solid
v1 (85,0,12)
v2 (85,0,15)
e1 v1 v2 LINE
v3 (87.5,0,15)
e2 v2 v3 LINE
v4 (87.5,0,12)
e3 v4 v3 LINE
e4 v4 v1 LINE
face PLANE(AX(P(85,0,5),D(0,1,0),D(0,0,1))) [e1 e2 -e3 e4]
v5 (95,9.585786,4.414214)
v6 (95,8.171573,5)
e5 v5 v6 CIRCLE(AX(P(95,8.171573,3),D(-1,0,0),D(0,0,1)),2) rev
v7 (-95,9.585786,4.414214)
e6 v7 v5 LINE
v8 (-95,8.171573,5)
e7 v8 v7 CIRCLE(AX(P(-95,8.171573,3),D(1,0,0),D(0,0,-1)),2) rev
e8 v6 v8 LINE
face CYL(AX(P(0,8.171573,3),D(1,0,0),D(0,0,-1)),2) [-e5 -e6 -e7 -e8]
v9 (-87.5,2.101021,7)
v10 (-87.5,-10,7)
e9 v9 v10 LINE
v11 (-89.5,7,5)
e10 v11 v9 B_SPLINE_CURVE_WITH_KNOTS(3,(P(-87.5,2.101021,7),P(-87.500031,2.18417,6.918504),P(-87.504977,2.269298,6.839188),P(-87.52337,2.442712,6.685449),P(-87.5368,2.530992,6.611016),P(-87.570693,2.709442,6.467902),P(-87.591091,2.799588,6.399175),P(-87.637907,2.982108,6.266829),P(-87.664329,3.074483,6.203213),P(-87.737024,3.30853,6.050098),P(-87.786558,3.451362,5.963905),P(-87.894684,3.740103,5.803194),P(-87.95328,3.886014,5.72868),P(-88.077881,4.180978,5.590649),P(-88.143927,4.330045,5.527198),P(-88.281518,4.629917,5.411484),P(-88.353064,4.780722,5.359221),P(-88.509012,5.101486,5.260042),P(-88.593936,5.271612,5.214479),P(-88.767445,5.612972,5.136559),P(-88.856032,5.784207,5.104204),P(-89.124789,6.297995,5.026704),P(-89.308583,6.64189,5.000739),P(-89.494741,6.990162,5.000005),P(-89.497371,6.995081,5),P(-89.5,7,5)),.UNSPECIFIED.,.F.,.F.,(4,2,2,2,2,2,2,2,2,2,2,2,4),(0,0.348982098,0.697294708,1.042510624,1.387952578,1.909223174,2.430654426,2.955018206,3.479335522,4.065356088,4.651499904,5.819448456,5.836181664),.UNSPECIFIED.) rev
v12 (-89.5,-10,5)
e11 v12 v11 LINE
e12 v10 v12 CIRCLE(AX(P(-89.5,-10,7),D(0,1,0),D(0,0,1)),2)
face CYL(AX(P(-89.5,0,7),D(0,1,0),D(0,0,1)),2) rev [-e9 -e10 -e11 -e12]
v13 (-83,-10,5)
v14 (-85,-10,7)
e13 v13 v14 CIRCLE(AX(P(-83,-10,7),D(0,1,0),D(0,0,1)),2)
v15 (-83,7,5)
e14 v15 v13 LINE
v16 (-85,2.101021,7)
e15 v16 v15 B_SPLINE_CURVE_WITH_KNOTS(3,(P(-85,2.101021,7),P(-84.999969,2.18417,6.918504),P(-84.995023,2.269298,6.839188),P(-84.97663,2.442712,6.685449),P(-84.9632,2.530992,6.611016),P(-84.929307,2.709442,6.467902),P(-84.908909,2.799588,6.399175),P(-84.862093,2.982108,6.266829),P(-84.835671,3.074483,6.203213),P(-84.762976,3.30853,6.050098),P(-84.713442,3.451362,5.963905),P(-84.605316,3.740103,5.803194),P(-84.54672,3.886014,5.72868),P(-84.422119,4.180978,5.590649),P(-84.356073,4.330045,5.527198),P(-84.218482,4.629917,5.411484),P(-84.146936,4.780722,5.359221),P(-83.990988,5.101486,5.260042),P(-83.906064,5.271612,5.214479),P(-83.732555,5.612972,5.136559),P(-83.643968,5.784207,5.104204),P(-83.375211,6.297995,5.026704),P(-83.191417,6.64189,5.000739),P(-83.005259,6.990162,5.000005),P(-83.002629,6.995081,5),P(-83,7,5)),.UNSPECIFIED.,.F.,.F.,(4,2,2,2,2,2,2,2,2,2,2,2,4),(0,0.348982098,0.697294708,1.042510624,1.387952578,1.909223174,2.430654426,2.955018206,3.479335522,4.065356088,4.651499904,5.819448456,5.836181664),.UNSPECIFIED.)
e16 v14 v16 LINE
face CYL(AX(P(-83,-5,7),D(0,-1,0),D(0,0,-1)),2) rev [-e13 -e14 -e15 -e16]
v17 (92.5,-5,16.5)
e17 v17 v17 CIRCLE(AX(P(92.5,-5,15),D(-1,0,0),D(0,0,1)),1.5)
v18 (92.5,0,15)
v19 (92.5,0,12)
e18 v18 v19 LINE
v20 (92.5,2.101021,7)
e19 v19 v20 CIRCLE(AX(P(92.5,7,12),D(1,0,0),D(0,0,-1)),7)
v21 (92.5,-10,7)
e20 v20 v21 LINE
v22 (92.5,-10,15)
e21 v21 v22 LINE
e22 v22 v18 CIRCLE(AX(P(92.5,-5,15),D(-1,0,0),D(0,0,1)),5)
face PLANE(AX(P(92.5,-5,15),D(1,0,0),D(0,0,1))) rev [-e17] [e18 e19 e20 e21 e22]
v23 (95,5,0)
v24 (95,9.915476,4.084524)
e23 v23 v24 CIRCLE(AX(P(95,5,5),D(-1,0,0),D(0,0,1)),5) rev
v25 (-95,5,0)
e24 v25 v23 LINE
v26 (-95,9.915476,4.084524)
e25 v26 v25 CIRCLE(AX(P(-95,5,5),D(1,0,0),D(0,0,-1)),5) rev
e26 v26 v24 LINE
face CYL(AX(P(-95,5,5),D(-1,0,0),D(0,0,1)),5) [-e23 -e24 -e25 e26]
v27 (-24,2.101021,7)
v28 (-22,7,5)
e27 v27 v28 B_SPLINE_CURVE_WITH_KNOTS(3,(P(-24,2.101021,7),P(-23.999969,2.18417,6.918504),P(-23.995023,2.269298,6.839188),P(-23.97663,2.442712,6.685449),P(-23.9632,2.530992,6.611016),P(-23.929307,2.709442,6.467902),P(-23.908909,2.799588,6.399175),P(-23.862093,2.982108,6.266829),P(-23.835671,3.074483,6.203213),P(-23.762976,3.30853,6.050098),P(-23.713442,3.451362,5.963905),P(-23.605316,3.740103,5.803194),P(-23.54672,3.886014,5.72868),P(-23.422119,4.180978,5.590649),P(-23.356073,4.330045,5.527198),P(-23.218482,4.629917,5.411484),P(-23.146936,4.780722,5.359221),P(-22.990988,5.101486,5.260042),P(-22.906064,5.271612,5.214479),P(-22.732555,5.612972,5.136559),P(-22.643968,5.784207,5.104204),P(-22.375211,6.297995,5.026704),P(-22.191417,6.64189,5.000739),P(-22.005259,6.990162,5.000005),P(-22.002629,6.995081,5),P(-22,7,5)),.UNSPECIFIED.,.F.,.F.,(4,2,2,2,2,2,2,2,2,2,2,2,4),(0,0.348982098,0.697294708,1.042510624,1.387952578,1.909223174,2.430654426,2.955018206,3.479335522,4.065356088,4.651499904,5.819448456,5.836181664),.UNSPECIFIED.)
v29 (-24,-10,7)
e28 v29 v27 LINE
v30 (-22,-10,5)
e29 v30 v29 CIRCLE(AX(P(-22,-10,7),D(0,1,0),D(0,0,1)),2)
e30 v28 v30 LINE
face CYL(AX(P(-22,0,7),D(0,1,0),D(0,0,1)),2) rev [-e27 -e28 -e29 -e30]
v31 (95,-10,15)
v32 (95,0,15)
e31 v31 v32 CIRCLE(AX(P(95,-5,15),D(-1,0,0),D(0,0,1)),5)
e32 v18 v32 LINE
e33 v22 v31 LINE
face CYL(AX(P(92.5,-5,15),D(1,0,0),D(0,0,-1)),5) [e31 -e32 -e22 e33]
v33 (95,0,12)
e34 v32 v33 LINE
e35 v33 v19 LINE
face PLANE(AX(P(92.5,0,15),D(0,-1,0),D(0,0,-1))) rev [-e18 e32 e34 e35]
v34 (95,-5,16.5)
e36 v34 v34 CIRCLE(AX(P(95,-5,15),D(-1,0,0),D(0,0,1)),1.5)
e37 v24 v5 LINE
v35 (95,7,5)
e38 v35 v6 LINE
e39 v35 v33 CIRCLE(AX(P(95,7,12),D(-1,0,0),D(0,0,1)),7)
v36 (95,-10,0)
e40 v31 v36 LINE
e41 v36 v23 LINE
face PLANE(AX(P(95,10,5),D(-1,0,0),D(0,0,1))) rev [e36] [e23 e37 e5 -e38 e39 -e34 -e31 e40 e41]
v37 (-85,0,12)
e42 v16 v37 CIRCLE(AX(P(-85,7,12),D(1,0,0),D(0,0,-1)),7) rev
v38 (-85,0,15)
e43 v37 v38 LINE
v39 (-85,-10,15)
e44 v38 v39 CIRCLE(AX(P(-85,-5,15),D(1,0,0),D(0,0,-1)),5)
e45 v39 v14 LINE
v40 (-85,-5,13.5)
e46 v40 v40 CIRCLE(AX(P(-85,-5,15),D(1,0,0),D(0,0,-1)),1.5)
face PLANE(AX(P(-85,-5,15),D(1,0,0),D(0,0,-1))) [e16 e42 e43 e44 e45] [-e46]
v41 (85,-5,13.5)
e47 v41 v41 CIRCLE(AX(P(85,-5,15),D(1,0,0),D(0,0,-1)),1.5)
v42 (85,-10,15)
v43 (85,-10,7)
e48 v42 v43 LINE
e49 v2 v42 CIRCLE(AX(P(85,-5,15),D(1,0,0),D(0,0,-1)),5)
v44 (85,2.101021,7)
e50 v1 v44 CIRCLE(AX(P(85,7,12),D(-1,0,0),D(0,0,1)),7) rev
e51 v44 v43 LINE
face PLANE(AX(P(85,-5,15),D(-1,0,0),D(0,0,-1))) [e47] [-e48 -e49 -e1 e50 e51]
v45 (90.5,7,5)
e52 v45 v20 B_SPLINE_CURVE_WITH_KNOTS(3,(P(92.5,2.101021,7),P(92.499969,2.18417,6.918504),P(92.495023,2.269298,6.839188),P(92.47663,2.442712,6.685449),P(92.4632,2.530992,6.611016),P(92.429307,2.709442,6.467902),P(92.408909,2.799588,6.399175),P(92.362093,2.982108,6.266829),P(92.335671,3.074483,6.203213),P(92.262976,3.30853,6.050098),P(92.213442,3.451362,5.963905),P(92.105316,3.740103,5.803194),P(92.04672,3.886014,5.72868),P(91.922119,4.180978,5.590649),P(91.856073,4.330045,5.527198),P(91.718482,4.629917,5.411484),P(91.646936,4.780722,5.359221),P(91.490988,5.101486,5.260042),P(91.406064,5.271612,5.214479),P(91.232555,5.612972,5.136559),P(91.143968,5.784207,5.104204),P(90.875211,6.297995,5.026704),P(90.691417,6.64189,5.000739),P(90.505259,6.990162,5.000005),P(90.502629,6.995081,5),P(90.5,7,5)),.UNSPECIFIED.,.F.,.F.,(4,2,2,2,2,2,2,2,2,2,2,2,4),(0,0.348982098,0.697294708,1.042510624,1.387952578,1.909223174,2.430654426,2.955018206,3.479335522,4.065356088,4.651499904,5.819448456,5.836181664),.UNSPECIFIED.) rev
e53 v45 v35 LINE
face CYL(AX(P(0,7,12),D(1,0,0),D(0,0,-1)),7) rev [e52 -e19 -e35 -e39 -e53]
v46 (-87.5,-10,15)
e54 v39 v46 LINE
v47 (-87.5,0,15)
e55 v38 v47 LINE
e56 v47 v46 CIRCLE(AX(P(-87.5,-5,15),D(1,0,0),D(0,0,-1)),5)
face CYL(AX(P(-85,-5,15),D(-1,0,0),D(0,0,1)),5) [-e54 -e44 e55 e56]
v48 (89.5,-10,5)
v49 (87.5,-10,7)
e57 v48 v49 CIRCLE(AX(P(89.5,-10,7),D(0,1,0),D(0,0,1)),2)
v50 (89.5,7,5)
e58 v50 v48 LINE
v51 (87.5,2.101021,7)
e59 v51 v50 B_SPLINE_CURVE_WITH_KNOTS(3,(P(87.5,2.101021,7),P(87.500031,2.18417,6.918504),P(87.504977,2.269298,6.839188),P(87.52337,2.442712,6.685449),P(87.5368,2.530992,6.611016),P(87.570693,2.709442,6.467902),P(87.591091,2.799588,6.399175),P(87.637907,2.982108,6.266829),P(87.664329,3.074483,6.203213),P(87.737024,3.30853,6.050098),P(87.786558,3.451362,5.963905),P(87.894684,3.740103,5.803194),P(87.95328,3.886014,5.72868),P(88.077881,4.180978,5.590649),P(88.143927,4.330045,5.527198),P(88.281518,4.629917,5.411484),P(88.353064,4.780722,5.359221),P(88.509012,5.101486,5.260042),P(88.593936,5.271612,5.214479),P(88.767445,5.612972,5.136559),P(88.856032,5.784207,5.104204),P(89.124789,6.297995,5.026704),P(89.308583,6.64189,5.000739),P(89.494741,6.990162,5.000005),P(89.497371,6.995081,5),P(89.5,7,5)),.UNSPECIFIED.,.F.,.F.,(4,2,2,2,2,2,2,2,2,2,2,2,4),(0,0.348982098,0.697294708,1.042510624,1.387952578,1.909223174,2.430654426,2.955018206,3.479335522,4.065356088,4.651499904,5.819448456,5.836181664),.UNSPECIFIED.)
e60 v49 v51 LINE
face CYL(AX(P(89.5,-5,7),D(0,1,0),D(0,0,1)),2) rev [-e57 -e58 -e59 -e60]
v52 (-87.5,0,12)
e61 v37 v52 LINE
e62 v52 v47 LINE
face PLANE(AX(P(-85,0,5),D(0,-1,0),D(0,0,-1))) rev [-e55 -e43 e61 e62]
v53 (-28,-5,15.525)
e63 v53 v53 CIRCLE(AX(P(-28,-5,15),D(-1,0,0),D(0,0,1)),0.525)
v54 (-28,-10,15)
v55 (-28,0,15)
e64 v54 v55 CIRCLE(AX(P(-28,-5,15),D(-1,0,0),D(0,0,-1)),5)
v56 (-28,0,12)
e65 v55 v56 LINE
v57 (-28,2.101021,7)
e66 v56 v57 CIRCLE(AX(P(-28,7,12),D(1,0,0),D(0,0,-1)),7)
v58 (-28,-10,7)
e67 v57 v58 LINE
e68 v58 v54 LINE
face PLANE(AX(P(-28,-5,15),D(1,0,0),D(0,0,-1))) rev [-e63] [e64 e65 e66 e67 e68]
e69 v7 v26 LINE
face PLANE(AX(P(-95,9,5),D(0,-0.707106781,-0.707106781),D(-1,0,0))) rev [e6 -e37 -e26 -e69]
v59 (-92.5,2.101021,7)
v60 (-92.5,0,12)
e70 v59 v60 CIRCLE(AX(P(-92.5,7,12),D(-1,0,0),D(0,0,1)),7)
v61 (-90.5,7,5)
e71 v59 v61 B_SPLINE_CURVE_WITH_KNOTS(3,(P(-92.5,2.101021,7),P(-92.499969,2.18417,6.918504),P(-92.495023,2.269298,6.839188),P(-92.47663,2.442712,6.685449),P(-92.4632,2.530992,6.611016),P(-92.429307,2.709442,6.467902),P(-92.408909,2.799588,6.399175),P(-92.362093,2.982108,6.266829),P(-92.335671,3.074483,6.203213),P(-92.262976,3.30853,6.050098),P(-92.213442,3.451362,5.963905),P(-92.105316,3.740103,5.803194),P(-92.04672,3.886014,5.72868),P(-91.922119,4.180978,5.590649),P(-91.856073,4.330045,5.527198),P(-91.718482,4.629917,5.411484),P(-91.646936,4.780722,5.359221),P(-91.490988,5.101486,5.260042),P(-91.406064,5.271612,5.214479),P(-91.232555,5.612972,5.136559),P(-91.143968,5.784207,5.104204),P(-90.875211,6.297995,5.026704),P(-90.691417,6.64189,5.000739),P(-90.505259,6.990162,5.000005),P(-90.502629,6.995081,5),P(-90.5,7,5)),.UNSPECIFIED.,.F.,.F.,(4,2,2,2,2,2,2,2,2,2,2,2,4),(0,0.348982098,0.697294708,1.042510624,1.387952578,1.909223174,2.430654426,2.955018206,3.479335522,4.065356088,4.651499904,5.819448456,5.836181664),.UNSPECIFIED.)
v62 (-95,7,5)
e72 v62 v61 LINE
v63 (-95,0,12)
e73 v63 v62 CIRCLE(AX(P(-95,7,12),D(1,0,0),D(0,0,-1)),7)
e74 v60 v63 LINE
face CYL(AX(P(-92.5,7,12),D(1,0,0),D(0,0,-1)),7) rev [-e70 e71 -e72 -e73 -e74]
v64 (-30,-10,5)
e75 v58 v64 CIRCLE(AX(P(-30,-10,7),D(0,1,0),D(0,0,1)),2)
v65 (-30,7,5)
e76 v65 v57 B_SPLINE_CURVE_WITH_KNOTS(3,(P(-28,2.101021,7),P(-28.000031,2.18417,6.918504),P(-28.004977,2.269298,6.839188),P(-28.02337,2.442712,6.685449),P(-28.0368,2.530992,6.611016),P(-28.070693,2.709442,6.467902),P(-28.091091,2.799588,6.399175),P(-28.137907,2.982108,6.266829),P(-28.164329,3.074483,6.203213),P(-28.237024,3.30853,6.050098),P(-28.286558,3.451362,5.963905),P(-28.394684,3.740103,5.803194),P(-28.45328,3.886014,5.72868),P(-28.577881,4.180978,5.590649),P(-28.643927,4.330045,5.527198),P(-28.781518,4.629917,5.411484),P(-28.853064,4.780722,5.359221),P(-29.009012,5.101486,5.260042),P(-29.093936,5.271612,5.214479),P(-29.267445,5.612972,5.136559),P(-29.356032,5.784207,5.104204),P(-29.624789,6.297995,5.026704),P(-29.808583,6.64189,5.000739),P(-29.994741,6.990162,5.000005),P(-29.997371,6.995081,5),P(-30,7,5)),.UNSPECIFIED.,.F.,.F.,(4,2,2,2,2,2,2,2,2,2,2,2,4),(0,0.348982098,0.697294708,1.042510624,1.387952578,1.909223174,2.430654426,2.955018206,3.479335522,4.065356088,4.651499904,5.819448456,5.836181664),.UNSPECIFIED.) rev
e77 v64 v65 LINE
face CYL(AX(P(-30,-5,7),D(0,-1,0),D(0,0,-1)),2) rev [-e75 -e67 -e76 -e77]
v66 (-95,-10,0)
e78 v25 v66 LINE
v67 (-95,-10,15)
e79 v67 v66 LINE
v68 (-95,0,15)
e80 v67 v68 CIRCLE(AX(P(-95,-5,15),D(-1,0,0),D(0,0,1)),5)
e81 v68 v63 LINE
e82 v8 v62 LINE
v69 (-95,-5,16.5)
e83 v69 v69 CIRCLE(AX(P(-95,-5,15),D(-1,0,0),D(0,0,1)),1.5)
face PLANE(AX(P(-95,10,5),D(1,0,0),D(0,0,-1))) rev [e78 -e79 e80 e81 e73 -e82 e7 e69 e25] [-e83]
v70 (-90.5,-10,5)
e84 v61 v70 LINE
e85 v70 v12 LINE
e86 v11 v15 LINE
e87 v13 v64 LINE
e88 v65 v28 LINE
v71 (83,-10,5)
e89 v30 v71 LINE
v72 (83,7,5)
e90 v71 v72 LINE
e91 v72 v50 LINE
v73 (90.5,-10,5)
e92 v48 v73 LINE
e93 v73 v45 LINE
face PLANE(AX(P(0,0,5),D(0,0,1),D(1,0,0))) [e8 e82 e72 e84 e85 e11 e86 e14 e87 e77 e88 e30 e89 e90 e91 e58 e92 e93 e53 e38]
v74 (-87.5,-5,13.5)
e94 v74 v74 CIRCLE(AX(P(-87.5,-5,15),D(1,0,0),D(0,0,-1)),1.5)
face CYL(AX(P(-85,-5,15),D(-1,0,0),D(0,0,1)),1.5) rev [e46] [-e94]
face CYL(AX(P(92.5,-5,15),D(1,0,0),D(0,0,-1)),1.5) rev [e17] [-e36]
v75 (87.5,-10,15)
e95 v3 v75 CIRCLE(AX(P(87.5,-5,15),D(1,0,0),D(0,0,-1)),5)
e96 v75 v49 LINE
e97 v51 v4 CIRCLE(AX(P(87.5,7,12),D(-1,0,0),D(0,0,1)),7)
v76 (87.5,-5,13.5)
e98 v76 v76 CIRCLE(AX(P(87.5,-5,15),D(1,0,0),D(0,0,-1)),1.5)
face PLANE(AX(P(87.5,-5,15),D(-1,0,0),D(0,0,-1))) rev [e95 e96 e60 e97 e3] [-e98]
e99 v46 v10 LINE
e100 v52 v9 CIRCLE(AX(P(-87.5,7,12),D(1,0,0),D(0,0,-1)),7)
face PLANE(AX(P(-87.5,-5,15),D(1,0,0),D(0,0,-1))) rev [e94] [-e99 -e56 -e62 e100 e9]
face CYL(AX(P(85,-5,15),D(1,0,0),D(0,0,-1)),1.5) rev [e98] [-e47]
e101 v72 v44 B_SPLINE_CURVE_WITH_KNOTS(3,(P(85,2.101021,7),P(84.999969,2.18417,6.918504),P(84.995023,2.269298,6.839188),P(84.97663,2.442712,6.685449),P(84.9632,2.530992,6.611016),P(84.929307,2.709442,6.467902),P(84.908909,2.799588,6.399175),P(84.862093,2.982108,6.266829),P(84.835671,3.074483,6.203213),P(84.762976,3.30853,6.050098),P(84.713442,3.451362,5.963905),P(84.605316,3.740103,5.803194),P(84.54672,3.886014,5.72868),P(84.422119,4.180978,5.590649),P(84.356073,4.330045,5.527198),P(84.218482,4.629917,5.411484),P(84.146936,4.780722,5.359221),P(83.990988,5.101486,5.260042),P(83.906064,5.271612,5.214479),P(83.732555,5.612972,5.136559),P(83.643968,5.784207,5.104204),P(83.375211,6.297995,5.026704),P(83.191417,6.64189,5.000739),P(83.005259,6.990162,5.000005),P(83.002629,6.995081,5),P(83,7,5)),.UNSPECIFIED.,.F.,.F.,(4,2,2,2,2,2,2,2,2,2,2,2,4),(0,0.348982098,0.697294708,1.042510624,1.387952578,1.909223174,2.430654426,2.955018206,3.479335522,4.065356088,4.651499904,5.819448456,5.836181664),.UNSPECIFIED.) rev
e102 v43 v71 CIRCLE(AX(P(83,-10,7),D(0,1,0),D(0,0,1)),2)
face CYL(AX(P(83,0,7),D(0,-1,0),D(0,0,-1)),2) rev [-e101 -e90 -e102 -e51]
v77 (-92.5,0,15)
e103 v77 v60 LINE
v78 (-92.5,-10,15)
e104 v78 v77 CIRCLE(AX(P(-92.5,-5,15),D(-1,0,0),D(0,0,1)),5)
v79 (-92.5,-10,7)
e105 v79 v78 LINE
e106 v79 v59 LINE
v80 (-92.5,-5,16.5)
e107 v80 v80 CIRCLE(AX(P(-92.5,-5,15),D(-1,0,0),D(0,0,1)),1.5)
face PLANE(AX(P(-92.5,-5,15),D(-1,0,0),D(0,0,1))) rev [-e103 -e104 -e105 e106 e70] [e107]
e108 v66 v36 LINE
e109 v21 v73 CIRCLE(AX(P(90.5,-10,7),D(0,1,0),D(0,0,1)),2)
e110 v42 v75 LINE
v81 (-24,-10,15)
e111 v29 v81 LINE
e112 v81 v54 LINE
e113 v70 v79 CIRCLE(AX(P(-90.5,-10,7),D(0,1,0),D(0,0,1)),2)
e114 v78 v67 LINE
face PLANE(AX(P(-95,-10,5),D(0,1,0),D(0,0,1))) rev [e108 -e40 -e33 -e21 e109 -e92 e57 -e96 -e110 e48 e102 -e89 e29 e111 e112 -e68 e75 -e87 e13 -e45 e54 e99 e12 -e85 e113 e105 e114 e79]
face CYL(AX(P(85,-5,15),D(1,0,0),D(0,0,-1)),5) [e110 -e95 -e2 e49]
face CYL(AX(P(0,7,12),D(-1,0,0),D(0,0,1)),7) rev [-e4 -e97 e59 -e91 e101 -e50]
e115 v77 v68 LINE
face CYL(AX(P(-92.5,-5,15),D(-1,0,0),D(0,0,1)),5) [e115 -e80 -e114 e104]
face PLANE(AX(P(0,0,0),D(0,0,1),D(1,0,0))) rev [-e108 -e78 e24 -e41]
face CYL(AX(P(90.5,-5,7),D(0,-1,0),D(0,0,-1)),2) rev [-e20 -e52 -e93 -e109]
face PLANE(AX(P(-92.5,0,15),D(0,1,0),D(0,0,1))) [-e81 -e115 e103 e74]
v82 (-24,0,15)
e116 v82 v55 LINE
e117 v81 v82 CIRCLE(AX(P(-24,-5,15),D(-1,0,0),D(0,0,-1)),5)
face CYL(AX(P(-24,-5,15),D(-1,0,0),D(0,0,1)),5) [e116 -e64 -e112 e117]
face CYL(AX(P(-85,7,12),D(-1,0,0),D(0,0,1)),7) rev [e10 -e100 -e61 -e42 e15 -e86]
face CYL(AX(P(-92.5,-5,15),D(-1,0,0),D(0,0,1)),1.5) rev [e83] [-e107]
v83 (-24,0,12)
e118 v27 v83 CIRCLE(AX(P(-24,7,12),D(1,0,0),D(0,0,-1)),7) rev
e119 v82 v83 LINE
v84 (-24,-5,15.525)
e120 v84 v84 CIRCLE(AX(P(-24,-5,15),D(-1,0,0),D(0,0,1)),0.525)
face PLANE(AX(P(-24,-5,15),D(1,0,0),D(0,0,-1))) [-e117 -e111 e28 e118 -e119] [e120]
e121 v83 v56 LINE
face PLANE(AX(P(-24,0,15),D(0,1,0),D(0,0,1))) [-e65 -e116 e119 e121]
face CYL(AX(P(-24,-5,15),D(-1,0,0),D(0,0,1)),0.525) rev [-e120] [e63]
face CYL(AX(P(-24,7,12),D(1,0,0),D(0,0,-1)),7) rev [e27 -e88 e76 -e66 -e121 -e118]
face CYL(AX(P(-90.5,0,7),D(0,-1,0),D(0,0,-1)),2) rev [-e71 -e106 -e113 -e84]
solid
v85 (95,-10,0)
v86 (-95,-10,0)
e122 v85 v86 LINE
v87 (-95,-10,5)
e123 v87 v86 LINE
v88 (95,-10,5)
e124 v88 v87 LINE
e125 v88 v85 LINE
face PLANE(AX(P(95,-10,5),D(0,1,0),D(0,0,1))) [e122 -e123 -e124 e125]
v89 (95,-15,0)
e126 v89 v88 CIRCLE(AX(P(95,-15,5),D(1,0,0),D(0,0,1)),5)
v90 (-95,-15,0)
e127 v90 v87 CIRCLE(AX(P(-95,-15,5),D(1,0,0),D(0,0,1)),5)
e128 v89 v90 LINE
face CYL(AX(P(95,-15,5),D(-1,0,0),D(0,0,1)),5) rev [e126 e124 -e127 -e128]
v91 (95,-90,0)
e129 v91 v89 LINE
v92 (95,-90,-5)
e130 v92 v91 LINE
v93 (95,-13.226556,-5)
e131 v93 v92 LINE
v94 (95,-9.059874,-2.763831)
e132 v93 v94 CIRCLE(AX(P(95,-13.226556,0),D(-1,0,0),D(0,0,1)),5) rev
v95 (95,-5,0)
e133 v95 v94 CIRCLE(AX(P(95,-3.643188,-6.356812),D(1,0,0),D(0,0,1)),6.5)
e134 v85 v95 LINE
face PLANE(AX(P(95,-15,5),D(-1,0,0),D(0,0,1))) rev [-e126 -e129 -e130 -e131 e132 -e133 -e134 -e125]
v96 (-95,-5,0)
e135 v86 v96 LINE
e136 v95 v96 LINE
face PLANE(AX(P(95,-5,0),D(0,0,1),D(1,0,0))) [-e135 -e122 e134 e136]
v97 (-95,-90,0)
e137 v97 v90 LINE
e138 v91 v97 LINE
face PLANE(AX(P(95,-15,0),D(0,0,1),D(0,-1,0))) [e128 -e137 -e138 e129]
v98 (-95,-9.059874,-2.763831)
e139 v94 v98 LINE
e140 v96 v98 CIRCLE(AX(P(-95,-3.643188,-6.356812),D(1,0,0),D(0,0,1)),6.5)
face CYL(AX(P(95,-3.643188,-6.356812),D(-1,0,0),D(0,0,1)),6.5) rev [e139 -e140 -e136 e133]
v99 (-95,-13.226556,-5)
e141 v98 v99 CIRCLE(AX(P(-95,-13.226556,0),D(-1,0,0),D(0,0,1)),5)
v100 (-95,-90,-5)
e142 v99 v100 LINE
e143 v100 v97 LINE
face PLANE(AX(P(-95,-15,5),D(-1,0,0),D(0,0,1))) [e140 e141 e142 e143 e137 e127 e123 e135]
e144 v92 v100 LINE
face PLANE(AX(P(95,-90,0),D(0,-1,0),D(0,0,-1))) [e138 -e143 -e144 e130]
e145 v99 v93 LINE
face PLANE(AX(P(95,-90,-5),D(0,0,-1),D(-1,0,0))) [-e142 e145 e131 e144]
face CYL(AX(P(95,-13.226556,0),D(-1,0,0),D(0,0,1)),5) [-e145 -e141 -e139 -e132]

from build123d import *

# Parameters (mm, degrees)
ESQUISSE1_W        = 190
ESQUISSE1_H        = 20
BOSS_EXTRU_1_DEPTH = 5
BOSS_EXTRU_2_START = -67
ESQUISSE2_R        = 0.525
BOSS_EXTRU_2_DEPTH = 4
BOSS_EXTRU_3_DEPTH = 190
CONG_3_R           = 5
CONG_4_R           = 5
CHANFREIN1_SIZE    = 1
ESQUISSE6_R        = 1.5
BOSS_EXTRU_4_DEPTH = 2.5
BOSS_EXTRU_5_START = 5
ESQUISSE7_R        = 1.5
BOSS_EXTRU_5_DEPTH = 2.5
CONG_5_R           = 7
CONG_6_R           = 2
CONG_7_R           = 2


# Some blends are built 0.0001 mm under size
with BuildPart() as part:
    # Esquisse1 → Boss.-Extru.1 (new body)
    with BuildSketch(Plane.XY):
        Rectangle(ESQUISSE1_W, ESQUISSE1_H)
    extrude(amount=BOSS_EXTRU_1_DEPTH)

    # Esquisse2 → Boss.-Extru.2 (add)
    with BuildSketch(Plane.ZY.offset(95).offset(BOSS_EXTRU_2_START)):
        with BuildLine():
            Line((5, -10), (15, -10))
            ThreePointArc((15, -10), (20, -5), (15, 0))
            Line((15, 0), (5, 0))
            Line((5, 0), (5, -10))
        make_face()
        with Locations((15, -5)):
            Circle(ESQUISSE2_R, mode=Mode.SUBTRACT)
    extrude(amount=-BOSS_EXTRU_2_DEPTH)

    # Congé4
    cong_4_edges = [part.edges().sort_by_distance(p)[0] for p in [
        (0, 10, 0),
    ]]
    fillet(cong_4_edges, radius=CONG_4_R - 0.0001)  # a hair under: the kernel refuses the full size

    # Chanfrein1
    # the kernel refuses this chamfer: 1 mm, written as the material it takes off along each edge
    with BuildSketch(Plane(origin=(-97.571682988, 10, 5), x_dir=(0, 0.027495876610585623, -0.9996219169112968), z_dir=(1, 0, 0))) as chanfrein1_piece_1:
        Polygon((CHANFREIN1_SIZE * 0.999621916911, -CHANFREIN1_SIZE * 0.0274958766106), (-CHANFREIN1_SIZE * 0.0274958766106, -CHANFREIN1_SIZE * 0.999621916911), (0, 0), align=None)
    extrude(amount=195.143365976, mode=Mode.SUBTRACT)

    # Esquisse6 → Boss.-Extru.4 (add)
    with BuildSketch(Plane.ZY.offset(95)):
        with BuildLine():
            Line((5, 0), (5, -10))
            Line((5, -10), (15, -10))
            ThreePointArc((15, -10), (20, -5), (15, 0))
            Line((15, 0), (5, 0))
        make_face()
        with Locations((15, -5)):
            Circle(ESQUISSE6_R, mode=Mode.SUBTRACT)
    boss_extru_4 = extrude(amount=-BOSS_EXTRU_4_DEPTH)

    # Esquisse7 → Boss.-Extru.5 (add)
    with BuildSketch(Plane(origin=(-92.5, 0, 0), x_dir=(0, 0, -1), z_dir=(1, 0, 0)).offset(BOSS_EXTRU_5_START)):
        with BuildLine():
            Line((-5, 0), (-15, 0))
            ThreePointArc((-15, 0), (-20, -5), (-15, -10))
            Line((-15, -10), (-5, -10))
            Line((-5, -10), (-5, 0))
        make_face()
        with Locations(Location((-15, -5, 0), (0, 0, 180))):
            Circle(ESQUISSE7_R, mode=Mode.SUBTRACT)
    boss_extru_5 = extrude(amount=BOSS_EXTRU_5_DEPTH)

    # Symétrie2: Boss.-Extru.4, Boss.-Extru.5 across plane
    add(boss_extru_4.mirror(Plane(origin=(0, 0, 0), x_dir=(0, 0, 1), z_dir=(1, 0, 0))))
    add(boss_extru_5.mirror(Plane(origin=(0, 0, 0), x_dir=(0, 0, 1), z_dir=(1, 0, 0))))

    # Congé5
    cong_5_edges = [part.edges().sort_by_distance(p)[0] for p in [
        (-26, 0, 5),
        (-93.75, 0, 5),
        (-86.25, 0, 5),
        (93.75, 0, 5),
        (86.25, 0, 5),
    ]]
    fillet(cong_5_edges, radius=CONG_5_R)

    # Congé6
    cong_6_edges = [part.edges().sort_by_distance(p)[0] for p in [
        (-24, -1.5, 5),
        (-28, -1.5, 5),
        (-92.5, -1.5, 5),
        (-85, -1.5, 5),
        (-87.5, -1.5, 5),
        (92.5, -1.5, 5),
        (85, -1.5, 5),
        (87.5, -1.5, 5),
    ]]
    fillet(cong_6_edges, radius=CONG_6_R)

    # Congé7
    cong_7_edges = [part.edges().sort_by_distance(p)[0] for p in [
        (0, 9, 5),
    ]]
    fillet(cong_7_edges, radius=CONG_7_R)


with BuildPart() as body_2:
    # Esquisse3 → Boss.-Extru.3 (new, through all)
    with BuildSketch(Plane.ZY.offset(95)):
        with BuildLine():
            Line((5, -10), (0, -10))
            Line((0, -10), (0, -5))
            ThreePointArc((0, -5), (-1.760618077, -8.239381923), (-5, -10))
            Line((-5, -10), (-5, -90))
            Line((-5, -90), (0, -90))
            Line((0, -90), (0, -15))
            ThreePointArc((0, -15), (1.464466094, -11.464466094), (5, -10))
        make_face()
    extrude(amount=-BOSS_EXTRU_3_DEPTH)

    # Congé3
    cong_3_edges = [body_2.edges().sort_by_distance(p)[0] for p in [
        (0, -10, -5),
    ]]
    fillet(cong_3_edges, radius=CONG_3_R)


solid = Compound([part.part, body_2.part])
